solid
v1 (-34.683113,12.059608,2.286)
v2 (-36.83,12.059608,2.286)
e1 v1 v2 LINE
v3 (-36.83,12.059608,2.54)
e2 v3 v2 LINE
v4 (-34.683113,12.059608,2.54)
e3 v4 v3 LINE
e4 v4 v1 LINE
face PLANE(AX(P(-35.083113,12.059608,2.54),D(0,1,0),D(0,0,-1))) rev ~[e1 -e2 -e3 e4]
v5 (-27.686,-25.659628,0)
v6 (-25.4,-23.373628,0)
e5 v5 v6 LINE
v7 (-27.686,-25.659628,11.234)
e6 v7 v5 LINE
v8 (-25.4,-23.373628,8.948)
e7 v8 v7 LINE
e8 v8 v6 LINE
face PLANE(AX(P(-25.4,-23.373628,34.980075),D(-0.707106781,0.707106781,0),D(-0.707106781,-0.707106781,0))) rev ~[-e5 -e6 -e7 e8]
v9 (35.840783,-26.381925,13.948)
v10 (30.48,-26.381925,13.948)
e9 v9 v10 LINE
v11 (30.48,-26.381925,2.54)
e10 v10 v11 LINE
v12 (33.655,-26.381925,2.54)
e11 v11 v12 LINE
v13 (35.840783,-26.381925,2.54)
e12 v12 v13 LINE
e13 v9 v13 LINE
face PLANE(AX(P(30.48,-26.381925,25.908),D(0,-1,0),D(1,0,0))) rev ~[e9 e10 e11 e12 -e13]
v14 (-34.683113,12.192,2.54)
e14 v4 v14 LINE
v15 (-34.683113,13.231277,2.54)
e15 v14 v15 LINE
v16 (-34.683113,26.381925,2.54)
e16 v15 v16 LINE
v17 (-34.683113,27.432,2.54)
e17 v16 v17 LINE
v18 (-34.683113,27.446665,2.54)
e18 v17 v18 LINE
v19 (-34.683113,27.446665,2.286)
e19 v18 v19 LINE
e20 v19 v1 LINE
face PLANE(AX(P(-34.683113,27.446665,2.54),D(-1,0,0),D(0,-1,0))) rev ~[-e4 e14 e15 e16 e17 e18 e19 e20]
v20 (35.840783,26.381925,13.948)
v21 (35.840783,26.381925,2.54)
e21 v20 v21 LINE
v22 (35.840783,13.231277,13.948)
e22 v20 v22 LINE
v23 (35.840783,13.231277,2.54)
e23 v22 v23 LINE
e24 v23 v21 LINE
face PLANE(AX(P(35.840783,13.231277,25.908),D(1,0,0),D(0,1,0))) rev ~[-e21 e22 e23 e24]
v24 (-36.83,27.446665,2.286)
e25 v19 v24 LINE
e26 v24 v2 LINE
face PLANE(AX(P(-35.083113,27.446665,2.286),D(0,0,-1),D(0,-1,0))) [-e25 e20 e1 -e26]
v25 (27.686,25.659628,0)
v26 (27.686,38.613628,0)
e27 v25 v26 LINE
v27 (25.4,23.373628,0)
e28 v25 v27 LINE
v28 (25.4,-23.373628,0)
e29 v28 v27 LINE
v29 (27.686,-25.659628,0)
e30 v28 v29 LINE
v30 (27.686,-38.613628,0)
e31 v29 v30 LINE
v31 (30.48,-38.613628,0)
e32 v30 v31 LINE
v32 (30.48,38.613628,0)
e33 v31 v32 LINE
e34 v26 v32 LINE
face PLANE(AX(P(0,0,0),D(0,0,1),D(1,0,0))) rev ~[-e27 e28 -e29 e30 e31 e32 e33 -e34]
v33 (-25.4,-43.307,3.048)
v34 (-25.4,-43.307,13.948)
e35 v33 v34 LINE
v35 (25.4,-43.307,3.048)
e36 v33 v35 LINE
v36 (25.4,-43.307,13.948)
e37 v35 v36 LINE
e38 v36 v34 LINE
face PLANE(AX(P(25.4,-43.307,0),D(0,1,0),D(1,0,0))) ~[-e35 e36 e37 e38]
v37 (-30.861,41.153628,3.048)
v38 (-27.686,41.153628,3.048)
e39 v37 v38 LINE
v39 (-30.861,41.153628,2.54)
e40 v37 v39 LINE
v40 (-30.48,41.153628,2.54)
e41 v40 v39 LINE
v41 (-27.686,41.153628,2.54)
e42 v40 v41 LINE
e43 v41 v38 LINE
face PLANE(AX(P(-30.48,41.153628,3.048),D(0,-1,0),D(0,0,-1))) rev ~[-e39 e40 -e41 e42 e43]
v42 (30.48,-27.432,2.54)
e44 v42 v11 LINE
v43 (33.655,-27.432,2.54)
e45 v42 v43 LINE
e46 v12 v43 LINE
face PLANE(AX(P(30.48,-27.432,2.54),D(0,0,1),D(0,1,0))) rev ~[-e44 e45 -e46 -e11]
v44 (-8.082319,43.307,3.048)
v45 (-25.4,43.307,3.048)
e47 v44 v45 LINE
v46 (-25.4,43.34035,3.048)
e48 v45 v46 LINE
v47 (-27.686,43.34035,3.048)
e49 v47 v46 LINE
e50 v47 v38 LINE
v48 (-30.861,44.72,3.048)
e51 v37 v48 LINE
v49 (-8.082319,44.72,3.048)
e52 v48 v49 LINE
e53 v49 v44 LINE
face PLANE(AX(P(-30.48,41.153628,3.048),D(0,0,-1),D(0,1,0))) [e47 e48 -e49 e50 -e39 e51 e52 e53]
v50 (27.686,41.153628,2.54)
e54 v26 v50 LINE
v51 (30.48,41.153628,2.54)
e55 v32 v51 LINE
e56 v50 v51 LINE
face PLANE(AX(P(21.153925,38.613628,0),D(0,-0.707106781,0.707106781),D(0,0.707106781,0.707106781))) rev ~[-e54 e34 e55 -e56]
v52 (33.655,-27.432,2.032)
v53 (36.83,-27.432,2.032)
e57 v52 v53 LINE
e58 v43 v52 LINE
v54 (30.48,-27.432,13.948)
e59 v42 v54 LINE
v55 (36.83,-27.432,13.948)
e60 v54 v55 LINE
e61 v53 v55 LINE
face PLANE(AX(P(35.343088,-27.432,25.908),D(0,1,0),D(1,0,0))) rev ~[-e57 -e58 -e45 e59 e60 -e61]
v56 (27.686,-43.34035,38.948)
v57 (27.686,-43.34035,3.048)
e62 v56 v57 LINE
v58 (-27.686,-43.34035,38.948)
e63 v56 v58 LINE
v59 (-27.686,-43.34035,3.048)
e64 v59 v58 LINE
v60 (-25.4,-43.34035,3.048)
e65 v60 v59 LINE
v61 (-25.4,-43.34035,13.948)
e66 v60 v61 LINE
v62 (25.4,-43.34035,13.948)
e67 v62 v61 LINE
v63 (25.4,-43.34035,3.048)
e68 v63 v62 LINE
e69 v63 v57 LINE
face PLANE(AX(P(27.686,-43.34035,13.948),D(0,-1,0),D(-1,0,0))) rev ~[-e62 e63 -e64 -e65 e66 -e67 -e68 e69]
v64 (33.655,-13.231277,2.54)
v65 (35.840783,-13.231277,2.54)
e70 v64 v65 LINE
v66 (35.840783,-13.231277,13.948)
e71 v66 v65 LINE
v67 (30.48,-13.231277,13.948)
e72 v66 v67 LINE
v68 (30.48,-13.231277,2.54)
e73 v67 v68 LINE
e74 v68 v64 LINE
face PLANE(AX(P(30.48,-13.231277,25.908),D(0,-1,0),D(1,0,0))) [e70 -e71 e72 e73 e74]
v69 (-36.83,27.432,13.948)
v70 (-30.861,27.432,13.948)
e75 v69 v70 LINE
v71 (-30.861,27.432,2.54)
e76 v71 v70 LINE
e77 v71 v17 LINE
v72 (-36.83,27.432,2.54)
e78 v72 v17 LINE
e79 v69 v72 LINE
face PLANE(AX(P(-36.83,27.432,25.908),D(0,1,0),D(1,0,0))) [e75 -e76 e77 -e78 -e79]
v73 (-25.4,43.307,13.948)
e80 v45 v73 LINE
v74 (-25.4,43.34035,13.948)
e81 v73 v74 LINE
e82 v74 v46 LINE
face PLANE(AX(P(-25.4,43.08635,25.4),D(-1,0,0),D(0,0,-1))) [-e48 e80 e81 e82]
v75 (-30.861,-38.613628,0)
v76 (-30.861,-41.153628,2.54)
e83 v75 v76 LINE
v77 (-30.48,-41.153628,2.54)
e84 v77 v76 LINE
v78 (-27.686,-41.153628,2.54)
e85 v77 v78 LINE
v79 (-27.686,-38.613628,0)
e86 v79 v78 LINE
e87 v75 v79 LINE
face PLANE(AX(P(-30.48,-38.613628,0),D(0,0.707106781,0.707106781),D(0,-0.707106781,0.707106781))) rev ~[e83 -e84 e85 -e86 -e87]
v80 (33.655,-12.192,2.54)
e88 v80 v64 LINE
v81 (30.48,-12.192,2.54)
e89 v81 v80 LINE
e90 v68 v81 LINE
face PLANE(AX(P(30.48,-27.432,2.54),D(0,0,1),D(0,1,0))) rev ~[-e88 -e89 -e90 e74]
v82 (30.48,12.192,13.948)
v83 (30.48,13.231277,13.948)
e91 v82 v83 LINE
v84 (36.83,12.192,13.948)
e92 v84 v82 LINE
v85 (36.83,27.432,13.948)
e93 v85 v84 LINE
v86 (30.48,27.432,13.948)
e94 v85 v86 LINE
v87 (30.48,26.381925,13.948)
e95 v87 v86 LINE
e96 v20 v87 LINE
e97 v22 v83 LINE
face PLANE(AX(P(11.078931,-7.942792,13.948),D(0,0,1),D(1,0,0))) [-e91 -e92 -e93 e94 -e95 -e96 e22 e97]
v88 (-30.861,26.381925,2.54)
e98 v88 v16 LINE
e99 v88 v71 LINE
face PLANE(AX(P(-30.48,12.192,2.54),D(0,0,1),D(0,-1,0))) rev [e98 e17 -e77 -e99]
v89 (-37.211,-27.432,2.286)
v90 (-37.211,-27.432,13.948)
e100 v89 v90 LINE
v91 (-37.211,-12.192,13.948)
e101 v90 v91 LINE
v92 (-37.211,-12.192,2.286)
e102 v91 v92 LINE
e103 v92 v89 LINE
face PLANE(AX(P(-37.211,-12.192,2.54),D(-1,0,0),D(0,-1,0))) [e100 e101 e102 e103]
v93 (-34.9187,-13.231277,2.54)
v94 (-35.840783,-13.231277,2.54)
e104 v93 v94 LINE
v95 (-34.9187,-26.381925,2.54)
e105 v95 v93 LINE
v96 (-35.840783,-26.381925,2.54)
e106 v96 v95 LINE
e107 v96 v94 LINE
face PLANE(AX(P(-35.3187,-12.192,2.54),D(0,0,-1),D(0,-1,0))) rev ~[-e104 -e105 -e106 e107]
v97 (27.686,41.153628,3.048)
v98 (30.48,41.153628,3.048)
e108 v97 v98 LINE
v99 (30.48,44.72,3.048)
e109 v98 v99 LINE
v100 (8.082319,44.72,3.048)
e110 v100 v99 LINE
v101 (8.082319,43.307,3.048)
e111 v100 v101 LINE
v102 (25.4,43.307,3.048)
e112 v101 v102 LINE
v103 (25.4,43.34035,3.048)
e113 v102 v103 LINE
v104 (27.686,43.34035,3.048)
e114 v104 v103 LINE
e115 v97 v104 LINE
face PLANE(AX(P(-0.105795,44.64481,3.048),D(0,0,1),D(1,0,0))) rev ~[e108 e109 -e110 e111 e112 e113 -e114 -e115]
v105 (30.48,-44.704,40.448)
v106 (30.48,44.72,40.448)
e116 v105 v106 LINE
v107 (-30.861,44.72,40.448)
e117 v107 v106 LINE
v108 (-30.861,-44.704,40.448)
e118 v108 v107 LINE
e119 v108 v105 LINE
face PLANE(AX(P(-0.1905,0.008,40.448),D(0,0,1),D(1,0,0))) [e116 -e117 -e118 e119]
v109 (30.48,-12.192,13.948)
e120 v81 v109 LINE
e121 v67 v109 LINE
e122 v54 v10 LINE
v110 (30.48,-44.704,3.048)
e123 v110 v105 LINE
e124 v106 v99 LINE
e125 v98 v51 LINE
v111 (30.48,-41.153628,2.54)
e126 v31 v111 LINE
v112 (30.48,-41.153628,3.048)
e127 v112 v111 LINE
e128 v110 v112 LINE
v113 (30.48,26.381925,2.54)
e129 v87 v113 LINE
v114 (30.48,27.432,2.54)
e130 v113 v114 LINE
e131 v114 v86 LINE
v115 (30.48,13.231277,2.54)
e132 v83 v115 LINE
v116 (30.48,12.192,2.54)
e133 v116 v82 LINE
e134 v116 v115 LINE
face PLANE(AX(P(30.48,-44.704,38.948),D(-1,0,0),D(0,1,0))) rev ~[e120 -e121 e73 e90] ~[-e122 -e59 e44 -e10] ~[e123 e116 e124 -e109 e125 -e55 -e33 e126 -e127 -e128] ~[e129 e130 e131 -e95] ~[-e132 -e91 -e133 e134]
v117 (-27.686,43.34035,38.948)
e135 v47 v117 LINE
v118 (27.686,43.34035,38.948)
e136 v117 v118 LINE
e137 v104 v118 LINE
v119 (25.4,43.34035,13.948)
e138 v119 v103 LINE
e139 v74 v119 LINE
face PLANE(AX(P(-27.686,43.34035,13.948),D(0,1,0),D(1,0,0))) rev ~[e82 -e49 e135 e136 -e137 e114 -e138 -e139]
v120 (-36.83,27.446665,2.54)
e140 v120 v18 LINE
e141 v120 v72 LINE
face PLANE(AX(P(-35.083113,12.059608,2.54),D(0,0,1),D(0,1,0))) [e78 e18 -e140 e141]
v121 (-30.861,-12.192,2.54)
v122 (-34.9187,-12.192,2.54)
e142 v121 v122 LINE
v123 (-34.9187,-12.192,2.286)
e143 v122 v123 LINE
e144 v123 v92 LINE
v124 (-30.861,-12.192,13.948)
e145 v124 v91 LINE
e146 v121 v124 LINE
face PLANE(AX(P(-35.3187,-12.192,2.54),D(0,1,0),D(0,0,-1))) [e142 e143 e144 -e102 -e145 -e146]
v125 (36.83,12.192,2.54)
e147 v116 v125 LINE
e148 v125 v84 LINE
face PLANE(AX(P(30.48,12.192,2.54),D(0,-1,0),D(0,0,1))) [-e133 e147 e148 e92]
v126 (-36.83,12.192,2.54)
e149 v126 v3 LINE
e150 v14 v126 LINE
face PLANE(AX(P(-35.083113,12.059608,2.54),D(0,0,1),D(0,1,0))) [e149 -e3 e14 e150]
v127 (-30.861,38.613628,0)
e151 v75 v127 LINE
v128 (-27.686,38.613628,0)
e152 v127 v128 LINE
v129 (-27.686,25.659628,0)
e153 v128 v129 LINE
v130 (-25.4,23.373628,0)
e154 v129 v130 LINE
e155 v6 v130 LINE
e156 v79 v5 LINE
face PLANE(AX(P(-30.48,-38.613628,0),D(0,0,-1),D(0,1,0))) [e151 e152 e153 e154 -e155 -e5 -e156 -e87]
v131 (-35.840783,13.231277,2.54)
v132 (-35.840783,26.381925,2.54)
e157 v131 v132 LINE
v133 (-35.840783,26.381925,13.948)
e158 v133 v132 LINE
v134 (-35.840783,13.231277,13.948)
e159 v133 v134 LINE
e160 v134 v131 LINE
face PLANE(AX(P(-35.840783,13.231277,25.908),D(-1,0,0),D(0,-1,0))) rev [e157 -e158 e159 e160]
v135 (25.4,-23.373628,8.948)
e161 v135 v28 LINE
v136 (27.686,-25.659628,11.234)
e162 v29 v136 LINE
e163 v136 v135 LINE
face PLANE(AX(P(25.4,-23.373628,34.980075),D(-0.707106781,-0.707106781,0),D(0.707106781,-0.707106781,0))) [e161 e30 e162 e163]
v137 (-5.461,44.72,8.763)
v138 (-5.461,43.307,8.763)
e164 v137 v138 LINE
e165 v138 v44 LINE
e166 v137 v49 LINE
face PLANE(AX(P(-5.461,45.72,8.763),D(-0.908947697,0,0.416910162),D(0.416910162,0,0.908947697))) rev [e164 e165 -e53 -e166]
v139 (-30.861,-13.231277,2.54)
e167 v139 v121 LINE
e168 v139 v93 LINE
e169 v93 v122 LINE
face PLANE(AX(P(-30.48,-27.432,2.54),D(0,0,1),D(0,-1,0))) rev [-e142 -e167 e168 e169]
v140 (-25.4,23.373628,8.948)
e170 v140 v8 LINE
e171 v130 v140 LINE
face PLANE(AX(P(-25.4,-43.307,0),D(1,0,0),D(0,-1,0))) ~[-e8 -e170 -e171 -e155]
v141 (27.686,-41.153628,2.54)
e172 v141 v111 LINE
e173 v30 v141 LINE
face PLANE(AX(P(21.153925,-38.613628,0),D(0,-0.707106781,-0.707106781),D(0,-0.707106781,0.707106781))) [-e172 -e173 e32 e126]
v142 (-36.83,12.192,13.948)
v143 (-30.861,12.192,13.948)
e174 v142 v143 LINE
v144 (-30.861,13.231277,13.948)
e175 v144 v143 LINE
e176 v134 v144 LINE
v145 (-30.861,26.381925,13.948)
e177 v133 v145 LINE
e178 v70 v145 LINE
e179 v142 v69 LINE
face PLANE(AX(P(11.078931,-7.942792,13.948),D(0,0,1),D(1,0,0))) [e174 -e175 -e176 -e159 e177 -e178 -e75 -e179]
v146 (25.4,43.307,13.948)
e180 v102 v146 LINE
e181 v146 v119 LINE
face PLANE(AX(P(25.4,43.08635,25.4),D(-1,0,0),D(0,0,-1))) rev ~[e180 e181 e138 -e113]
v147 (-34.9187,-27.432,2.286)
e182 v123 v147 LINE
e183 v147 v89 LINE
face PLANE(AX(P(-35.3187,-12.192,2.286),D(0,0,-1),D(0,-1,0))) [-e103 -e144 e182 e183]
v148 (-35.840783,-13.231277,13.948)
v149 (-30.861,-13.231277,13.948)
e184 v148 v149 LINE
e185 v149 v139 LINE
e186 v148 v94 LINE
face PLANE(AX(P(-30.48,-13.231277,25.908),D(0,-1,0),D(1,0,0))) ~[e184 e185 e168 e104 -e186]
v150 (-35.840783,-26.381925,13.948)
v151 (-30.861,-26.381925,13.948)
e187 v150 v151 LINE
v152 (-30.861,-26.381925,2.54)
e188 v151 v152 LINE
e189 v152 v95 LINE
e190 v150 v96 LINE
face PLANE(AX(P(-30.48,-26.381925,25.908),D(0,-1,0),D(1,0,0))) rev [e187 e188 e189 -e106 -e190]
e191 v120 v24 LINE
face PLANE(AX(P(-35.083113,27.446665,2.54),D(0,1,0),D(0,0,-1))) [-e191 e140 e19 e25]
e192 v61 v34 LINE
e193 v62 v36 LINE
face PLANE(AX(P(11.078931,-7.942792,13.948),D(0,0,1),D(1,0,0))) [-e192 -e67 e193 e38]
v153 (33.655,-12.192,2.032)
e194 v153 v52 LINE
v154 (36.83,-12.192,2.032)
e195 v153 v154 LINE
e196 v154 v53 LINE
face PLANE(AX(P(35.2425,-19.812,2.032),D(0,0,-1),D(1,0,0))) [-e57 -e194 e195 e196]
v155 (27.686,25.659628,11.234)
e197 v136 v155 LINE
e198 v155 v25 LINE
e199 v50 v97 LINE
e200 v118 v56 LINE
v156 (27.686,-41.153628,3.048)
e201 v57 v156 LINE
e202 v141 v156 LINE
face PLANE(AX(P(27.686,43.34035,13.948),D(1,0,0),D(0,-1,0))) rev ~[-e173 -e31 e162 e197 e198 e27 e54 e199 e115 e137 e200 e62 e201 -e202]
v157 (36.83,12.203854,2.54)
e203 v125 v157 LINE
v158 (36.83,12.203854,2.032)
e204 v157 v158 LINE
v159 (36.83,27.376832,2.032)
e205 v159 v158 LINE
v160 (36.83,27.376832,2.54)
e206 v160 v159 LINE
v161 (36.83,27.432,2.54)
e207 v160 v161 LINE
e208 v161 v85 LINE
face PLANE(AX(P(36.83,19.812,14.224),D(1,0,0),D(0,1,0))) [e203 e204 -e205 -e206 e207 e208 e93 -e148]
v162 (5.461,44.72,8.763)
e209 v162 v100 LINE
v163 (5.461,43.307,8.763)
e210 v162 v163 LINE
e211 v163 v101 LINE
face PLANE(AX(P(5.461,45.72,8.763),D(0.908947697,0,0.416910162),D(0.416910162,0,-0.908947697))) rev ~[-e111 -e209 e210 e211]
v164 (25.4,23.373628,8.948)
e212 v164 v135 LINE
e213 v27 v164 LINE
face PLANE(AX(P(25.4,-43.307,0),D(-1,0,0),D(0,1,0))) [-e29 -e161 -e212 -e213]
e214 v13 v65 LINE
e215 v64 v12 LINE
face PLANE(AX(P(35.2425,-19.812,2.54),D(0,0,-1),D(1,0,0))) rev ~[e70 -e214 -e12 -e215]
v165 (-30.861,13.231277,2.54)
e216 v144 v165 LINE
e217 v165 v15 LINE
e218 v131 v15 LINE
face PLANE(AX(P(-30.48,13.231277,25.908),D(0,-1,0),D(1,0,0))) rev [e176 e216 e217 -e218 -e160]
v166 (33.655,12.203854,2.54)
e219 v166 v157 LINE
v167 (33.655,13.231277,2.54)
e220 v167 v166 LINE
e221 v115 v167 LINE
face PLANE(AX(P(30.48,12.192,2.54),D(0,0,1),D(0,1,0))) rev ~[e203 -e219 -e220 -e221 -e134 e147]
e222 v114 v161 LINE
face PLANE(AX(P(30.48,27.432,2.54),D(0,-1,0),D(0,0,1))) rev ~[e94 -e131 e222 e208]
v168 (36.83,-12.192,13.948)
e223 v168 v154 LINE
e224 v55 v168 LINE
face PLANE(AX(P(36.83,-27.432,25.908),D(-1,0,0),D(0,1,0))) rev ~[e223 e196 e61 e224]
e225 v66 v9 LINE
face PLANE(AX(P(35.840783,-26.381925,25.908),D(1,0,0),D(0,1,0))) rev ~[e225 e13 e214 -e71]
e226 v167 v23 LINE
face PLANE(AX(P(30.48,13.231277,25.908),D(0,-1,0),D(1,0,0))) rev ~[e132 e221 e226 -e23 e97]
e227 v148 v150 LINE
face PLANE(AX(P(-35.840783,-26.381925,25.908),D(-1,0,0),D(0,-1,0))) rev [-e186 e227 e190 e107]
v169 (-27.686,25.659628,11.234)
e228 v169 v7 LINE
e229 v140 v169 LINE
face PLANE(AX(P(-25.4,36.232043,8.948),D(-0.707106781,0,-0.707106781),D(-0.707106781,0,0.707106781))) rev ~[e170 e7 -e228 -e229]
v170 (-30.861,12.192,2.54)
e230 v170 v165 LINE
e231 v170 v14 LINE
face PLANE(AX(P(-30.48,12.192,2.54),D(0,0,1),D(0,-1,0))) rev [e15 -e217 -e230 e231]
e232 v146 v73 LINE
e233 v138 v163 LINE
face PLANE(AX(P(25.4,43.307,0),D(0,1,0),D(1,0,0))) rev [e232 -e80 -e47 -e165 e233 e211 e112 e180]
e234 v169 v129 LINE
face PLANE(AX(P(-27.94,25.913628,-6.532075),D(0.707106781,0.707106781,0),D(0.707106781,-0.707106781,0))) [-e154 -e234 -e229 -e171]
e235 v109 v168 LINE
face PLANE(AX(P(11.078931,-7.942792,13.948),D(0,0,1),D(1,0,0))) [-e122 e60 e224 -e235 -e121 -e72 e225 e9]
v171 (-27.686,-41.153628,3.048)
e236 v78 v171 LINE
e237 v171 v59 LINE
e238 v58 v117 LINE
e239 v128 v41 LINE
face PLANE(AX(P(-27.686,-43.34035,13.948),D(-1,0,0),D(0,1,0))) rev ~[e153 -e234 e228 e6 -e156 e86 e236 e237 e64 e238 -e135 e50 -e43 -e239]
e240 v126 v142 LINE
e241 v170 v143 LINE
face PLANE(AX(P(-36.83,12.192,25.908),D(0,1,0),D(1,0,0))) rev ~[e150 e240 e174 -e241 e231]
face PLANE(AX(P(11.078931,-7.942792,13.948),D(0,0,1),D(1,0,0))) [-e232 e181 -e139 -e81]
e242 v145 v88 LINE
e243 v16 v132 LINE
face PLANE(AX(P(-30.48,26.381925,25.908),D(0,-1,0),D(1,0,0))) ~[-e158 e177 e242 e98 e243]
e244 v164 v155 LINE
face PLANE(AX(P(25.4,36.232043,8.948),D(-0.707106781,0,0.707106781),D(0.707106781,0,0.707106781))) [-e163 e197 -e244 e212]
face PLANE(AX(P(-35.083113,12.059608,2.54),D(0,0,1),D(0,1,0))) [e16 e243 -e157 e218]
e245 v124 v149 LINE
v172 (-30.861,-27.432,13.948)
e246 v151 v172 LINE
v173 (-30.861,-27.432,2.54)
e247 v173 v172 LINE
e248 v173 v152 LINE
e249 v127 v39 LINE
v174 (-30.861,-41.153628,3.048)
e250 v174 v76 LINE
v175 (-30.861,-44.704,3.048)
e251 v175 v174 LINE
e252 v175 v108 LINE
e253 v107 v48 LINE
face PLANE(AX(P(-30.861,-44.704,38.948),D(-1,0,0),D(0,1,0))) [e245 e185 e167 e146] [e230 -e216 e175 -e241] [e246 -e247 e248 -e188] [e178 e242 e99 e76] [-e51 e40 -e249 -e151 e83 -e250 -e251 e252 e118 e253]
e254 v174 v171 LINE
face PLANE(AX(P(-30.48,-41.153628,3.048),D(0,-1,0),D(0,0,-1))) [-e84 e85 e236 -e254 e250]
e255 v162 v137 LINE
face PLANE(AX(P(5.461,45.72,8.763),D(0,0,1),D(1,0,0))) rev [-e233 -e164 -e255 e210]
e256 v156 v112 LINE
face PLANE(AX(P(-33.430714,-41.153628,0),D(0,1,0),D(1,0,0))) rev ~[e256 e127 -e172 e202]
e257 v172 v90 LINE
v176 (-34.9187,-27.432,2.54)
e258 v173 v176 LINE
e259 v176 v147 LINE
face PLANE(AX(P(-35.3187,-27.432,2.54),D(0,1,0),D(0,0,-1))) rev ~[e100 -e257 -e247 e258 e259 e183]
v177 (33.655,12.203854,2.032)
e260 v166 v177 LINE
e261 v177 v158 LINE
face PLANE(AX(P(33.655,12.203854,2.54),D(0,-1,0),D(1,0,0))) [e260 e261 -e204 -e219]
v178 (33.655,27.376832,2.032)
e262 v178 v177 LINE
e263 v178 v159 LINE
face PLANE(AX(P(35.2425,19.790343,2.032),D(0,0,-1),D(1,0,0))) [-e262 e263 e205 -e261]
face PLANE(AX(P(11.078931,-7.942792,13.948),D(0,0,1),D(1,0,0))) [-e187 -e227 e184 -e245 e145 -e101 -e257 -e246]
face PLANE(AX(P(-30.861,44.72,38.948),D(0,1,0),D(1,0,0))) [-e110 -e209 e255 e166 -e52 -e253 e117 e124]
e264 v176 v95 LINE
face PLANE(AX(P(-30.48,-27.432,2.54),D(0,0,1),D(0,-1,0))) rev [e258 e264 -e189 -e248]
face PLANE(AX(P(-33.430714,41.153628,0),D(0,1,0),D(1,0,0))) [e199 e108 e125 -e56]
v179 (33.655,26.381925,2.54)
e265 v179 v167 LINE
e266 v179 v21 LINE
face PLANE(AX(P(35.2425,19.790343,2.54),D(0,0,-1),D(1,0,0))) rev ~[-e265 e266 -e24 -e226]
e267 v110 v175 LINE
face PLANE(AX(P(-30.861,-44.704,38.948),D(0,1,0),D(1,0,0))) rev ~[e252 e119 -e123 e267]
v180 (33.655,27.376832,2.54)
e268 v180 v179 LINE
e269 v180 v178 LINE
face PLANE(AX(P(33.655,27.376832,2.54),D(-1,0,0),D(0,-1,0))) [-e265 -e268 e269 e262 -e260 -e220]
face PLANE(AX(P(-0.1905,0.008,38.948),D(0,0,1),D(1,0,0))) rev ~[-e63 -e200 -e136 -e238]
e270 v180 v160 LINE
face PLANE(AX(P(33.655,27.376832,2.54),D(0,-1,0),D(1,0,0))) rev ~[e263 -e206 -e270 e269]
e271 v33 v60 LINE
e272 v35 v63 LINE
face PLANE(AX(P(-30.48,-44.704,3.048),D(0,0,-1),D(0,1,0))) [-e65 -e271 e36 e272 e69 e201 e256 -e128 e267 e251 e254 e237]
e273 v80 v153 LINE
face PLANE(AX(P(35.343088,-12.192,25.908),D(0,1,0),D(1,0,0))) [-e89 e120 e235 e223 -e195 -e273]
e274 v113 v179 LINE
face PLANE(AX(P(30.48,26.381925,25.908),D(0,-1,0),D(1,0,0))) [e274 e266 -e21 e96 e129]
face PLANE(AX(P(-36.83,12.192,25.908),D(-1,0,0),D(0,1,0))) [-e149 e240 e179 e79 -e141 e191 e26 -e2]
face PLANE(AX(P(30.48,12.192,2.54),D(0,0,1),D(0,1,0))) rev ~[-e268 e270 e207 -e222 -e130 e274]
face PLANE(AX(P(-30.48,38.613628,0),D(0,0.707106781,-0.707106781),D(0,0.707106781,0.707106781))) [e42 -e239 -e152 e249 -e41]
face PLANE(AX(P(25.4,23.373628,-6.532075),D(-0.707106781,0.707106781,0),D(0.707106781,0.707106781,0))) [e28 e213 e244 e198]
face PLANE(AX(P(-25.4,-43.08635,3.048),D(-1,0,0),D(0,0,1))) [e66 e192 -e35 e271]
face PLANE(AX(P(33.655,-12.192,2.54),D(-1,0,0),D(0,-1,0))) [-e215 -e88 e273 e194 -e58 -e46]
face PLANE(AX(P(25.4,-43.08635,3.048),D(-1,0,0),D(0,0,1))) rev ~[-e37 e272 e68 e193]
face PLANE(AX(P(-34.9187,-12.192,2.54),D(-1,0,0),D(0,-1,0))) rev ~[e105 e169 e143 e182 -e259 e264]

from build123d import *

# Parameters (mm, degrees)
F0_W          = 60.96
F0_H          = 91.44
F0_W_2        = 50.8
F0_H_2        = 86.614
F1_DEPTH      = 28.448
F3_DEPTH      = 25.4
F4_W          = 66.649839282
F4_H          = 6.9823637605
F5_DEPTH      = 3.048
F6_W          = 64.9686481762
F6_H          = 4.777956934
F7_DEPTH      = 3.048
F9_DEPTH      = 2.286
F10_W         = 99.848318845
F10_H         = 48.2080141082
F11_DEPTH     = 50.8
F13_T1_DEPTH  = 15.8581495789
F13_T3_DEPTH  = 15.8581495789
F13_T8_DEPTH  = 41.5121495789
F13_T13_DEPTH = 41.5121495789
F13_T18_DEPTH = 41.5121495789
F13_T23_DEPTH = 41.5121495789
F14_W         = 15.24
F14_H         = 23.368
F15_DEPTH     = 6.35
F16_W         = 5.3607832682
F16_H         = 13.1506472826
F17_DEPTH     = 25.909
F19_DEPTH     = 0.254
F20_DEPTH     = 0.254
F21_DEPTH     = 1.016
F22_W         = 3.175
F22_H         = 15.24
F22_H_2       = 15.425526537
F23_DEPTH     = 0.508
F24_W         = 3.175
F24_H         = 15.24
F24_H_2       = 15.1729788631
F25_DEPTH     = 0.508
F26_W         = 1.4869117904
F26_H         = 15.24
F26_H_2       = 15.1544166729
F27_DEPTH     = 0.508
F28_W         = 1.5113
F28_H         = 15.24
F28_W_2       = 1.492887156
F28_H_2       = 15.3870563954
F29_DEPTH     = 0.254
F30_DEPTH     = 0.381
F31_DEPTH     = 0.254
F32_W         = 105.9566885233
F32_H         = 116.2753328681
F33_DEPTH     = 14.5
F35_DEPTH     = 25
F36_DEPTH     = 1
F37_DEPTH     = 0.4
F38_DEPTH     = 0.4
F39_W         = 61.341
F39_H         = 89.424
F40_DEPTH     = 1.5
F41_T4_DEPTH  = 72.4640866379
F41_T9_DEPTH  = 72.4640866379


# Not quite as in the source:
# - a fillet or chamfer that OpenCascade refuses, or shapes differently, is made with other operations: its cross-section is extruded or revolved along the edge and cut away or added
# - a feature names something its author has since deleted; it is built from what else it names


with BuildPart() as f1:
    # F0 (on Top) → F1 (new body)
    with BuildSketch(Plane.XY):
        Rectangle(F0_W, F0_H)
        Rectangle(F0_W_2, F0_H_2, mode=Mode.SUBTRACT)
    extrude(amount=F1_DEPTH)

    # F2 (on face) → F3 (cut)
    with BuildSketch(Plane(origin=(0, 45.72, 0), x_dir=(-1, 0, 0), z_dir=(0, 1, 0))):
        Polygon((-9.4803553075, 0), (0, 0), (9.4803553075, 0), (5.461, 8.763), (-5.461, 8.763), align=None)
        Polygon((-9.4803553075, 28.448), (-5.461, 19.685), (5.461, 19.685), (9.4803553075, 28.448), (0, 28.448), align=None)
    extrude(amount=-F3_DEPTH, mode=Mode.SUBTRACT)

    # F4 (on Top) → F5 (cut)
    with BuildSketch(Plane.XY):
        with Locations((-0.1057945192, 44.6448102593)):
            Rectangle(F4_W, F4_H)
        with Locations((-0.1057945192, -44.6448102593)):
            Rectangle(F4_W, F4_H)
    extrude(amount=F5_DEPTH, mode=Mode.SUBTRACT)

    # F6 (on face) → F7 (cut)
    with BuildSketch(Plane.XY.offset(28.448)):
        with Locations((-2.0043240881, 43.331021533)):
            Rectangle(F6_W, F6_H)
        with Locations((-2.0043240881, -43.331021533)):
            Rectangle(F6_W, F6_H)
    extrude(amount=-F7_DEPTH, mode=Mode.SUBTRACT)

    # F8 (on face) → F9 (cut)
    with BuildSketch(Plane(origin=(25.4, 0, 0), x_dir=(0, -1, 0), z_dir=(-1, 0, 0))):
        Polygon((-43.0863499641, 0), (-41.1536283791, 0), (-25.9136283791, 0), (-25.9136283791, 30.48), (-41.1536283791, 30.48), (-43.0863499641, 30.48), align=None)
        Polygon((25.9136283791, 30.48), (25.9136283791, 0), (41.1536283791, 0), (43.0863499641, 0), (43.0863499641, 30.48), (41.1536283791, 30.48), align=None)
    extrude(amount=-F9_DEPTH, mode=Mode.SUBTRACT)

    # F10 (on Right) → F11 (cut)
    with BuildSketch(Plane.YZ):
        with Locations((1.7518345267, 13.4315635078)):
            Rectangle(F10_W, F10_H)
    extrude(amount=-F11_DEPTH, mode=Mode.SUBTRACT)

    # F12: F1 across plane


with BuildPart() as f1_1:
    add(f1.part)
    add(f1.part.mirror(Plane.YZ))

    # F13: chamfer of 2.54 on 12 edges, made by hand

    # F13_s2 → F13_t1 (cut)
    with BuildSketch(Plane.YZ.offset(-37.0120747894)):
        Polygon((38.402043066, 28.448), (40.942043066, 25.908), (40.942043066, 28.448), align=None)
        Polygon((38.6136283791, 0), (41.1536283791, 2.54), (41.1536283791, 0), align=None)
        Polygon((-40.942043066, 25.908), (-38.402043066, 28.448), (-40.942043066, 28.448), align=None)
        Polygon((-38.6136283791, 0), (-41.1536283791, 2.54), (-41.1536283791, 0), align=None)
    extrude(amount=F13_T1_DEPTH, mode=Mode.SUBTRACT)

    # F13_s4 → F13_t3 (cut)
    with BuildSketch(Plane.YZ.offset(21.1539252106)):
        Polygon((38.402043066, 28.448), (40.942043066, 25.908), (40.942043066, 28.448), align=None)
        Polygon((-40.942043066, 25.908), (-38.402043066, 28.448), (-40.942043066, 28.448), align=None)
        Polygon((-38.6136283791, 0), (-41.1536283791, 2.54), (-41.1536283791, 0), align=None)
        Polygon((38.6136283791, 0), (41.1536283791, 2.54), (41.1536283791, 0), align=None)
    extrude(amount=F13_T3_DEPTH, mode=Mode.SUBTRACT)


with BuildPart() as f13_tool6:
    # F13_s7 → F13_t8 (new body)
    with BuildSketch(Plane.XY.offset(-6.5320747894)):
        Polygon((25.4, 23.3736283791), (27.94, 25.9136283791), (25.4, 25.9136283791), align=None)
    extrude(amount=F13_T8_DEPTH)

    split(bisect_by=Plane.YZ.offset(27.686), keep=Keep.BOTTOM)


with BuildPart() as f1_2:
    add(f1_1.part)

    # F13_t5: cut F13_tool6
    add(f13_tool6.part, mode=Mode.SUBTRACT)


with BuildPart() as f13_tool11:
    # F13_s12 → F13_t13 (new body)
    with BuildSketch(Plane.XY.offset(34.9800747894)):
        Polygon((25.4, -23.3736283791), (27.94, -25.9136283791), (25.4, -25.9136283791), align=None)
    extrude(amount=-F13_T13_DEPTH)

    split(bisect_by=Plane.YZ.offset(27.686), keep=Keep.BOTTOM)


with BuildPart() as f1_3:
    add(f1_2.part)

    # F13_t10: cut F13_tool11
    add(f13_tool11.part, mode=Mode.SUBTRACT)


with BuildPart() as f13_tool16:
    # F13_s17 → F13_t18 (new body)
    with BuildSketch(Plane.XY.offset(-6.5320747894)):
        Polygon((-27.94, 25.9136283791), (-25.4, 23.3736283791), (-25.4, 25.9136283791), align=None)
    extrude(amount=F13_T18_DEPTH)

    split(bisect_by=Plane.YZ.offset(-27.686), keep=Keep.TOP)


with BuildPart() as f1_4:
    add(f1_3.part)

    # F13_t15: cut F13_tool16
    add(f13_tool16.part, mode=Mode.SUBTRACT)


with BuildPart() as f13_tool21:
    # F13_s22 → F13_t23 (new body)
    with BuildSketch(Plane.XY.offset(34.9800747894)):
        Polygon((-25.4, -23.3736283791), (-27.94, -25.9136283791), (-25.4, -25.9136283791), align=None)
    extrude(amount=-F13_T23_DEPTH)

    split(bisect_by=Plane.YZ.offset(-27.686), keep=Keep.TOP)


with BuildPart() as f1_5:
    add(f1_4.part)

    # F13_t20: cut F13_tool21
    add(f13_tool21.part, mode=Mode.SUBTRACT)

    # F14 (on face) → F15 (join)
    with BuildSketch(Plane.YZ.offset(30.48)):
        with Locations((-19.812, 14.224)):
            Rectangle(F14_W, F14_H)
        with Locations((19.812, 14.224)):
            Rectangle(F14_W, F14_H)
    extrude(amount=F15_DEPTH)

    # F16 (on face) → F17 (cut, through all)
    with BuildSketch(Plane.XY.offset(25.908)):
        with Locations((33.1603916341, -19.8066011071)):
            Rectangle(F16_W, F16_H)
        with Locations((33.1603916341, 19.8066011071)):
            Rectangle(F16_W, F16_H)
    extrude(amount=-F17_DEPTH, mode=Mode.SUBTRACT)

    # F18: F1 across plane


with BuildPart() as f1_6:
    add(f1_5.part)
    add(f1_5.part.mirror(Plane.YZ))

    # F19 (cut): faces of the model
    f19_faces = [f1_6.faces().sort_by_distance(p)[0] for p in [
        (26.543, -43.0863499641, 14.224),
        (-26.543, -43.0863499641, 14.224),
    ]]
    extrude(f19_faces, amount=-F19_DEPTH, mode=Mode.SUBTRACT)

    # F20 (cut): faces of the model
    f20_faces = [f1_6.faces().sort_by_distance(p)[0] for p in [
        (26.543, 43.0863499641, 14.224),
        (-26.543, 43.0863499641, 14.224),
    ]]
    extrude(f20_faces, amount=-F20_DEPTH, mode=Mode.SUBTRACT)

    # F21 (cut): a face of the model
    f21_faces = [f1_6.faces().sort_by_distance(p)[0] for p in [
        (0, -45.72, 14.224),
    ]]
    extrude(f21_faces, amount=-F21_DEPTH, mode=Mode.SUBTRACT)

    # F22 (on face) → F23 (join)
    with BuildSketch(Plane.XY.offset(25.908)):
        with Locations((-35.2425, 19.812)):
            Rectangle(F22_W, F22_H)
        with Locations((-35.2425, -19.7230628692)):
            Rectangle(F22_W, F22_H_2)
    extrude(amount=F23_DEPTH)

    # F24 (on face) → F25 (join)
    with BuildSketch(Plane(origin=(0, 0, 2.54), x_dir=(1, 0, 0), z_dir=(0, 0, -1))):
        with Locations((35.2425, 19.812)):
            Rectangle(F24_W, F24_H)
        with Locations((35.2425, -19.7903430089)):
            Rectangle(F24_W, F24_H_2)
    extrude(amount=F25_DEPTH)

    # F26 (on face) → F27 (join)
    with BuildSketch(Plane.XY.offset(25.908)):
        with Locations((36.0865441048, -19.812)):
            Rectangle(F26_W, F26_H)
        with Locations((36.0865441048, 19.7994005866)):
            Rectangle(F26_W, F26_H_2)
    extrude(amount=F27_DEPTH)

    # F28 (on face) → F29 (join)
    with BuildSketch(Plane(origin=(0, 0, 2.54), x_dir=(1, 0, 0), z_dir=(0, 0, -1))):
        with Locations((-36.07435, 19.812)):
            Rectangle(F28_W, F28_H)
        with Locations((-36.083556422, -19.7531366721)):
            Rectangle(F28_W_2, F28_H_2)
    extrude(amount=F29_DEPTH)

    # F30 (add): faces of the model
    f30_faces = [f1_6.faces().sort_by_distance(p)[0] for p in [
        (-30.48, 0.4258489378, 14.2172059936),
        (-35.3187, -19.812, 2.413),
        (-35.8407832682, -19.8066011071, 14.224),
        (-36.83, -19.8101053315, 14.3540262363),
    ]]
    extrude(f30_faces, amount=F30_DEPTH, dir=(-1, 0, 0))

    # F31 (add): a face of the model
    f31_faces = [f1_6.faces().sort_by_distance(p)[0] for p in [
        (-35.337112844, 19.7531366721, 2.413),
    ]]
    extrude(f31_faces, amount=F31_DEPTH)

    # F32 (on face) → F33 (cut)
    with BuildSketch(Plane.XY.offset(28.448)):
        with Locations((11.0789313912, -7.9427920282)):
            Rectangle(F32_W, F32_H)
    extrude(amount=-F33_DEPTH, mode=Mode.SUBTRACT)

    # F34 (on face) → F35 (join)
    with BuildSketch(Plane.XY.offset(13.948)):
        Polygon((-30.861, -27.432), (-30.861, -44.704), (30.48, -44.704), (30.48, -27.432), (30.48, -26.3819247484), (30.48, -13.2312774658), (30.48, -12.192), (30.48, 12.192), (30.48, 13.2312774658), (30.48, 26.3819247484), (30.48, 27.432), (30.48, 45.72), (-30.861, 45.72), (-30.861, 27.432), (-30.861, 26.3819247484), (-30.861, 13.2312774658), (-30.861, 12.192), (-30.861, -12.192), (-30.861, -13.2312774658), (-30.861, -26.3819247484), align=None)
        Polygon((-25.4, -43.3403499641), (-27.686, -43.3403499641), (-27.686, -25.6596283791), (-27.686, 25.6596283791), (-27.686, 43.3403499641), (-25.4, 43.3403499641), (25.4, 43.3403499641), (27.686, 43.3403499641), (27.686, 25.6596283791), (27.686, -25.6596283791), (27.686, -43.3403499641), (25.4, -43.3403499641), align=None, mode=Mode.SUBTRACT)
    extrude(amount=F35_DEPTH)

    # F36 (cut): a face of the model
    f36_faces = [f1_6.faces().sort_by_distance(p)[0] for p in [
        (-0.1974395314, 45.72, 21.5545051375),
    ]]
    extrude(f36_faces, amount=-F36_DEPTH, mode=Mode.SUBTRACT)

    # F37 (add): a face of the model
    f37_faces = [f1_6.faces().sort_by_distance(p)[0] for p in [
        (-35.083112844, 19.7531366721, 2.413),
    ]]
    extrude(f37_faces, amount=F37_DEPTH)

    # F38 (add): a face of the model
    f38_faces = [f1_6.faces().sort_by_distance(p)[0] for p in [
        (-35.3187, -19.812, 2.413),
    ]]
    extrude(f38_faces, amount=F38_DEPTH)

    # F39 (on face) → F40 (join)
    with BuildSketch(Plane.XY.offset(38.948)):
        with Locations((-0.1905, 0.008)):
            Rectangle(F39_W, F39_H)
    extrude(amount=F40_DEPTH)

    # F41: chamfer of 5 on 2 edges, made by hand


with BuildPart() as f41_tool2:
    # F41_s3 → F41_t4 (new body)
    with BuildSketch(Plane.XZ.offset(-36.2320433189)):
        Polygon((25.4, 8.948), (30.4, 13.948), (25.4, 13.948), align=None)
    extrude(amount=F41_T4_DEPTH)

    split(bisect_by=Plane.YZ.offset(27.686), keep=Keep.BOTTOM)


with BuildPart() as f1_7:
    add(f1_6.part)

    # F41_t1: cut F41_tool2
    add(f41_tool2.part, mode=Mode.SUBTRACT)


with BuildPart() as f41_tool7:
    # F41_s8 → F41_t9 (new body)
    with BuildSketch(Plane.XZ.offset(-36.2320433189)):
        Polygon((-25.4, 8.948), (-30.4, 13.948), (-25.4, 13.948), align=None)
    extrude(amount=F41_T9_DEPTH)

    split(bisect_by=Plane.YZ.offset(-27.686), keep=Keep.TOP)


with BuildPart() as f1_8:
    add(f1_7.part)

    # F41_t6: cut F41_tool7
    add(f41_tool7.part, mode=Mode.SUBTRACT)


solid = f1_8.part
